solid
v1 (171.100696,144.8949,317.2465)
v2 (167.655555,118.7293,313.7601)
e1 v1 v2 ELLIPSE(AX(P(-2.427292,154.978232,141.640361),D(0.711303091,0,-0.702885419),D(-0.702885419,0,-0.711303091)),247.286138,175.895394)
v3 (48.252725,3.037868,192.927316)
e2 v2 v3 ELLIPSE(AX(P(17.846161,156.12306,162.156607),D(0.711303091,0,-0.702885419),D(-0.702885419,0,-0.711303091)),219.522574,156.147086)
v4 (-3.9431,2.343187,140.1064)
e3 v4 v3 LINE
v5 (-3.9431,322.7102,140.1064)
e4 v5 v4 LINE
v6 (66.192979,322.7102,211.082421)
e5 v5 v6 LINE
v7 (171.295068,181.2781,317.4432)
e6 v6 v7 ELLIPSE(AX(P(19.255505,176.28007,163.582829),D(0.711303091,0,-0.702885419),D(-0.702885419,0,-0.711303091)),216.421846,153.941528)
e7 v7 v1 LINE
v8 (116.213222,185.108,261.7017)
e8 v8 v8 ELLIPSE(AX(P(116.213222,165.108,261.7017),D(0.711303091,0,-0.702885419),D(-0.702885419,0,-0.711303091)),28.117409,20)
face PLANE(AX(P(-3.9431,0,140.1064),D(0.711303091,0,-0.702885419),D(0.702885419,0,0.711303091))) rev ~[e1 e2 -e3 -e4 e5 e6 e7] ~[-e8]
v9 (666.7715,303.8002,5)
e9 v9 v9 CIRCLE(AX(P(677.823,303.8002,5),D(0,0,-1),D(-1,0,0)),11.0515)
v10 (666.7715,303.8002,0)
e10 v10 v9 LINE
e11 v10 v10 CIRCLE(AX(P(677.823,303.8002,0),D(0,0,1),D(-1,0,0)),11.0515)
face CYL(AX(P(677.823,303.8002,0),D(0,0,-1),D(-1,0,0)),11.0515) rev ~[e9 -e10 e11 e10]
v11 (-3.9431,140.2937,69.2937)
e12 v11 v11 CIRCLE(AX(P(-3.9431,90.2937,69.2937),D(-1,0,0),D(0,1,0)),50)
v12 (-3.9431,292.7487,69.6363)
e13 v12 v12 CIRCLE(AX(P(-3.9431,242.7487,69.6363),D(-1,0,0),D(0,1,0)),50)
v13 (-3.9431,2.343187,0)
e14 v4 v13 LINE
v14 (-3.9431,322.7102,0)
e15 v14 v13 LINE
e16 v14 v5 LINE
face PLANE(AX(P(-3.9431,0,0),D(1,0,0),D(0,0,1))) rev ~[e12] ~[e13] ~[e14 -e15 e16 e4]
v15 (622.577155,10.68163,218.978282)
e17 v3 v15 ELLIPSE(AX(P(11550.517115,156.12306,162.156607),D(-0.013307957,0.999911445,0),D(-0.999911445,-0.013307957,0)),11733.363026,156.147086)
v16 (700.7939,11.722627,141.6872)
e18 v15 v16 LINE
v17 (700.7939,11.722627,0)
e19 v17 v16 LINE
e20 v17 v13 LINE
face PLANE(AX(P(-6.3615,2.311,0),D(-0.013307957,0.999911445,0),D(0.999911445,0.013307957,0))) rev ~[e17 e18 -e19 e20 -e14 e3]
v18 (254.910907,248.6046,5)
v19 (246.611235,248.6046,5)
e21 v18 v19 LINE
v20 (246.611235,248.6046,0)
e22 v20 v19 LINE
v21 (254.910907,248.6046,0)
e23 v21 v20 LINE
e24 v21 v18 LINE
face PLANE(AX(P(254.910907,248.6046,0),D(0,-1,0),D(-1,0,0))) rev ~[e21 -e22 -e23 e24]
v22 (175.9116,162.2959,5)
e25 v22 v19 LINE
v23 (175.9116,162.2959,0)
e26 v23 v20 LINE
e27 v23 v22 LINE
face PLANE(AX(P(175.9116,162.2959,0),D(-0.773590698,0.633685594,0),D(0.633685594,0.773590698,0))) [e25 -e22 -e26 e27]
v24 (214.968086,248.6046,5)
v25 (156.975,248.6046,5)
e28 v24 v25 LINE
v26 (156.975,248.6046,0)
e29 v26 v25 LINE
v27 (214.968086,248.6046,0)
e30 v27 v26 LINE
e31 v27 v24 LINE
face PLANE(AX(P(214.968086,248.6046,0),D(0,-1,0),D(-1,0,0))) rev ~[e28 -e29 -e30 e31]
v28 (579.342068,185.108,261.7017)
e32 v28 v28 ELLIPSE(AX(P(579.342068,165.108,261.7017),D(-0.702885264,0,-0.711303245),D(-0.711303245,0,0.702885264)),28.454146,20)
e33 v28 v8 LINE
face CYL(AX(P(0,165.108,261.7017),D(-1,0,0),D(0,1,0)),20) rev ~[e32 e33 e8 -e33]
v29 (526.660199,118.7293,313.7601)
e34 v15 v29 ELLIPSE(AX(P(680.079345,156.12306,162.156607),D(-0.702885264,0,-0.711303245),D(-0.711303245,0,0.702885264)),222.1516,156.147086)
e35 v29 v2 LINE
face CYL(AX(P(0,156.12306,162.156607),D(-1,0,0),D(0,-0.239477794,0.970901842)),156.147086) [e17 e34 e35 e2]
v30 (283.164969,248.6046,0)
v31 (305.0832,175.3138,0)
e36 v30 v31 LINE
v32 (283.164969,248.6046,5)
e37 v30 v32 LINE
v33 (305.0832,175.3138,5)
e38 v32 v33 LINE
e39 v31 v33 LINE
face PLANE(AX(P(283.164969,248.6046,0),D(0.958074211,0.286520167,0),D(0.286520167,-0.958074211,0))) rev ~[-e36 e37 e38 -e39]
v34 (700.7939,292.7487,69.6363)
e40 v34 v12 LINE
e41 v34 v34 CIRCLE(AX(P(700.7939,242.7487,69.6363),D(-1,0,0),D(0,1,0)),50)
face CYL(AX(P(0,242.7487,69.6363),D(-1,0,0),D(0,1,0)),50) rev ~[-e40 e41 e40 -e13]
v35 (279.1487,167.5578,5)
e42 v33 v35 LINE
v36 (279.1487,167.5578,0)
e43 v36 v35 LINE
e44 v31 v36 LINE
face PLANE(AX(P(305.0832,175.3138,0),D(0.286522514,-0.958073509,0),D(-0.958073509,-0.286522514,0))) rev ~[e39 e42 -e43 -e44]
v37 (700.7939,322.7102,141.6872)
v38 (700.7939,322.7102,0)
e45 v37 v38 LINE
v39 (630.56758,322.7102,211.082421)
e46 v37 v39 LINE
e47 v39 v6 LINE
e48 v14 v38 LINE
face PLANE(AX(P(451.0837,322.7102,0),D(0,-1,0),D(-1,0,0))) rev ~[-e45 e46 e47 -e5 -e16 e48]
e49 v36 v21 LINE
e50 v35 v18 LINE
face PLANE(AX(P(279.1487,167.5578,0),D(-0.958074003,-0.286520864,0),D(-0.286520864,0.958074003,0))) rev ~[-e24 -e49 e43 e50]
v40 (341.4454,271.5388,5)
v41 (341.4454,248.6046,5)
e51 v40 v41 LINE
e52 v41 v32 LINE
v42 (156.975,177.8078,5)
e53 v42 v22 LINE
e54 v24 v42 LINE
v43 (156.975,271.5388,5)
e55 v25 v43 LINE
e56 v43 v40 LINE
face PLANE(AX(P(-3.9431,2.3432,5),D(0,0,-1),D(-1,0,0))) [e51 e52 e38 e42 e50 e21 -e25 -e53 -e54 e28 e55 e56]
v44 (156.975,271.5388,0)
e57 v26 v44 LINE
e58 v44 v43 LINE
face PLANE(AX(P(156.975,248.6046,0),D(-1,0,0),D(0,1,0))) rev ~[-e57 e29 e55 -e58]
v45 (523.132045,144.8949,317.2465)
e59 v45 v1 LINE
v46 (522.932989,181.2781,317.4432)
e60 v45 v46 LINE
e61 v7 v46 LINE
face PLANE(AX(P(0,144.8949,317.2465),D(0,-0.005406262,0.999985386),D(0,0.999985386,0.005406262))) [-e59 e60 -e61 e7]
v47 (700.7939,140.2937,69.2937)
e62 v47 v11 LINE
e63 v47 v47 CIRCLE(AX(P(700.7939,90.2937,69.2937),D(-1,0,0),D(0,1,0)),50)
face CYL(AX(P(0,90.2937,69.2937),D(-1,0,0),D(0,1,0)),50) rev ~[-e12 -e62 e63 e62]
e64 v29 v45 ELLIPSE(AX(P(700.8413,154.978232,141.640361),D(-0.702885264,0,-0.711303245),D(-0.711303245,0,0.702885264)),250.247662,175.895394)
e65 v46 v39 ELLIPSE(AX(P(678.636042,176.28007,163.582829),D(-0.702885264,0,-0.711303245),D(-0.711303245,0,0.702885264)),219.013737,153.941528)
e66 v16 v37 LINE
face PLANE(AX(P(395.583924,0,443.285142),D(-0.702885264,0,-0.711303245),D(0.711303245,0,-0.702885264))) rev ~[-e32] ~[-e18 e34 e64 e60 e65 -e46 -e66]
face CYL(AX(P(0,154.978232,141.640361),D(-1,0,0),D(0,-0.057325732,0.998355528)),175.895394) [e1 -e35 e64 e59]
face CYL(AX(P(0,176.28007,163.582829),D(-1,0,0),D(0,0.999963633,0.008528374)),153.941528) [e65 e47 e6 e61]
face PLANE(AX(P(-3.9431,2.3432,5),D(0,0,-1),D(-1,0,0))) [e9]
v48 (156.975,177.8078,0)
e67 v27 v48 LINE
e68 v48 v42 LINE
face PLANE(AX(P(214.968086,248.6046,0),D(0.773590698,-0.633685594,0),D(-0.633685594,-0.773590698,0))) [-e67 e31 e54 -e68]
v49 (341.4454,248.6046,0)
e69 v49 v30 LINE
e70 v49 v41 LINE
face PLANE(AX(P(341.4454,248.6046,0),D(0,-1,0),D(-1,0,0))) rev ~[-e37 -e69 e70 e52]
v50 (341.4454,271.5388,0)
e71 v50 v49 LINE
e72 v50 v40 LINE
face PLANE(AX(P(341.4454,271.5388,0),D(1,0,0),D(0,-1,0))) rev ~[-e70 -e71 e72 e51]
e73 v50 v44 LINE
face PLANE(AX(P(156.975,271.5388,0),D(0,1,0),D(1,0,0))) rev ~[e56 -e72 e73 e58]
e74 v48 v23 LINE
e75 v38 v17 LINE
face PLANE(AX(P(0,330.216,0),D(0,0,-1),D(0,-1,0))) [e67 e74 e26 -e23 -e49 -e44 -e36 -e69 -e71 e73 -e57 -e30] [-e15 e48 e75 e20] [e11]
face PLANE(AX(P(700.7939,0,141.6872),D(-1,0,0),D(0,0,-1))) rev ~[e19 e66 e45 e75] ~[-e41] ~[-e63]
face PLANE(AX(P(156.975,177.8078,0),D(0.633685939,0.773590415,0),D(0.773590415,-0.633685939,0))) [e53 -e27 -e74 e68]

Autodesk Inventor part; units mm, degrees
ref_plane "YZ Plane" through (0, 0, 0) normal (1, 0, 0) x (0, 1, 0)
ref_plane "XZ Plane" through (0, 0, 0) normal (0, 1, 0) x (-1, 0, 0)
ref_plane "XY Plane" through (0, 0, 0) normal (0, 0, 1) x (1, 0, 0)
sketch "Sketch1" plane through (0, 0, 0) normal (1, 0, 0) x (0, 1, 0)
  line L0 (330.216, 0) -> (0, 0)
  line L1 (0, 0) -> (0, 164.8957)
  arc A0 (118.7293, 313.7601) -> (0, 164.8957) centre (156.123, 162.1567) ccw
  arc A1 (144.8949, 317.2465) -> (118.7293, 313.7601) centre (154.9782, 141.6407) ccw
  line L2 (144.8949, 317.2465) -> (181.2781, 317.4432)
  arc A2 (330.216, 164.8957) -> (181.2781, 317.4432) centre (176.28, 163.5828) ccw
  line L3 (330.216, 164.8957) -> (330.216, 0)
  line L4 (330.216, 0) -> (0, 0)
  arc A3 (290.5507, 48.5961) -> (284.7281, 100.708) centre (242.7487, 69.6363) ccw
  circle A4 centre (242.7487, 69.6363) radius 50
  arc A5 (57.0662, 113.5176) -> (48.9146, 32.5841) centre (90.2937, 69.2937) ccw
  circle A6 centre (90.2937, 69.2937) radius 50
  circle A7 centre (165.108, 261.7017) radius 20
  dimension "d0" = 100
  dimension "d1" = 100
  dimension "d2" = 40
sketch "Sketch2" plane through (0, 0, 0) normal (0, 1, 0) x (-1, 0, 0)
  line L0 (-2089.1825, 1088.7803) -> (2413.4361, 1088.7803)
  line L1 (2413.4361, 1088.7803) -> (2413.4361, -1008.0732)
  line L2 (2413.4361, -1008.0732) -> (-2089.1825, -1008.0732)
  line L3 (-2089.1825, -1008.0732) -> (-2089.1825, 1088.7803)
  line L4 (-994.3855, 154.3994) -> (-877.0981, 0)
  line L5 (-877.0981, 0) -> (-549.3425, 0)
  line L6 (-549.3425, 0) -> (-549.3425, 138.7482)
  line L7 (-549.3425, 138.7482) -> (-727.3007, 309.2752)
  line L8 (-727.3007, 309.2752) -> (-869.8451, 302.5626)
  line L9 (-869.8451, 302.5626) -> (-881.5787, 366.7057)
  arc A0 (-869.8451, 302.5626) -> (-994.3855, 154.3994) centre (-863.6463, 170.9285) ccw
  line L10 (-172.1358, 318.294) -> (-272.072, 318.294)
  line L11 (-272.072, 318.294) -> (-450.7939, 141.6872)
  line L12 (-450.7939, 141.6872) -> (-450.7939, 0)
  line L13 (-450.7939, 0) -> (3.9431, 0)
  line L14 (3.9431, 0) -> (3.9431, 140.1064)
  line L15 (3.9431, 140.1064) -> (-172.1358, 318.294)
  line L16 (98.5967, 142.2155) -> (98.5967, 0)
  line L17 (98.5967, 0) -> (660.1371, 0)
  line L18 (660.1371, 0) -> (660.1371, 140.1064)
  line L19 (660.1371, 140.1064) -> (484.0582, 318.294)
  line L20 (484.0582, 318.294) -> (276.784, 318.294)
  line L21 (276.784, 318.294) -> (98.5967, 142.2155)
  point P0 (0, 0)
extrude "Extrusion1" add sketch "Sketch1" along normal mid plane 3000
extrude "Extrusion2" cut sketch "Sketch2" along normal mid plane 3000
sketch "Sketch3" plane through (0, 0, 0) normal (0, 0, 1) x (1, 0, 0)
  line L0 (-659.4013, 331.8291) -> (-659.4013, 0)
  line L1 (-659.4013, 0) -> (-101.5785, 2.8306)
  line L2 (-101.5785, 2.8306) -> (-101.5785, 327.2485)
  line L3 (-101.5785, 327.2485) -> (-659.4013, 331.8291)
  line L4 (-6.3615, 322.7102) -> (-6.3615, 2.311)
  line L5 (-6.3615, 2.311) -> (451.0837, 8.3992)
  line L6 (451.0837, 8.3992) -> (451.0837, 322.7102)
  line L7 (451.0837, 322.7102) -> (-6.3615, 322.7102)
  line L8 (550.0381, 321.2751) -> (550.0381, 9.7162)
  line L9 (550.0381, 9.7162) -> (880.8921, 11.9316)
  line L10 (880.8921, 11.9316) -> (881.9732, 8.1918)
  line L11 (550.0381, 321.2751) -> (881.436, 318.556)
  line L12 (881.436, 318.556) -> (884.7001, 327.2485)
  arc A0 (994.4459, 201.1298) -> (881.436, 318.556) centre (879.2692, 203.3778) ccw
  arc A1 (880.8921, 11.9316) -> (994.4459, 129.9671) centre (880.1263, 126.3072) ccw
  line L13 (994.4459, 201.1298) -> (994.4459, 129.9671)
  line L14 (-921.3329, 565.6411) -> (1466.6724, 565.6411)
  line L15 (1466.6724, 565.6411) -> (1466.6724, -337.8722)
  line L16 (1466.6724, -337.8722) -> (-921.3329, -337.8722)
  line L17 (-921.3329, -337.8722) -> (-921.3329, 565.6411)
  point P0 (0, 0)
extrude "Extrusion3" cut sketch "Sketch3" along normal mid plane 3000
chamfer_without_effect "Chamfer1"
sketch "Sketch5" plane through (-659.4013, 0, 0) normal (0, 0, -1) x (-1, 0, 0)
  line L0 (117.9817, -138.9278) -> (-593.002, -138.9278)
  line L1 (-593.002, -138.9278) -> (-593.002, 563.8836)
  line L2 (-593.002, 563.8836) -> (117.9817, 563.8836)
  line L3 (117.9817, 563.8836) -> (117.9817, -138.9278)
  line L4 (-1175.2731, -102.1528) -> (-1759.5873, -102.1528)
  line L5 (-1759.5873, -102.1528) -> (-1759.5873, 529.1516)
  line L6 (-1759.5873, 529.1516) -> (-1175.2731, 529.1516)
  line L7 (-1175.2731, 529.1516) -> (-1175.2731, -102.1528)
  point P0 (-659.4013, 0)
extrude "Extrusion5" cut sketch "Sketch5" along normal mid plane 2000
move faces "Move1" translate (250, 0, 0) faces at (450.7939, 188.0332, 134.0166) (417.0556, 165.298, 175.0262)
sketch "Sketch6" plane through (-3.9431, 2.3432, 0) normal (0, 0, -1) x (-1, 0, 0)
  circle A0 centre (-681.7661, 301.457) radius 11.0515
  line L0 (-704.737, 290.4055) -> (0, 290.4055) projected
  line L1 (-160.9181, 269.1956) -> (-345.3885, 269.1956)
  line L2 (-345.3885, 269.1956) -> (-345.3885, 246.2614)
  line L3 (-345.3885, 246.2614) -> (-160.9181, 246.2614)
  line L4 (-160.9181, 246.2614) -> (-160.9181, 269.1956)
  line L5 (-237.6977, 269.1956) -> (-160.9181, 175.4646)
  line L6 (-160.9181, 175.4646) -> (-179.8547, 159.9527)
  line L7 (-179.8547, 159.9527) -> (-256.6343, 253.6837)
  line L8 (-256.6343, 253.6837) -> (-237.6977, 269.1956)
  line L9 (-256.6343, 253.6837) -> (-282.5689, 261.4396)
  line L10 (-282.5689, 261.4396) -> (-309.0263, 172.9706)
  line L11 (-309.0263, 172.9706) -> (-283.0918, 165.2146)
  line L12 (-283.0918, 165.2146) -> (-256.6343, 253.6837)
  point P0 (-3.9431, -2.3432)
  point P1 (-287.108, 246.2614)
  point P2 (-258.854, 246.2614)
  point P3 (-250.5544, 246.2614)
  point P4 (-218.9112, 246.2614)
extrude "Extrusion6" cut sketch "Sketch6" against normal blind 5
properties part number "Kleiner Finger middle"
